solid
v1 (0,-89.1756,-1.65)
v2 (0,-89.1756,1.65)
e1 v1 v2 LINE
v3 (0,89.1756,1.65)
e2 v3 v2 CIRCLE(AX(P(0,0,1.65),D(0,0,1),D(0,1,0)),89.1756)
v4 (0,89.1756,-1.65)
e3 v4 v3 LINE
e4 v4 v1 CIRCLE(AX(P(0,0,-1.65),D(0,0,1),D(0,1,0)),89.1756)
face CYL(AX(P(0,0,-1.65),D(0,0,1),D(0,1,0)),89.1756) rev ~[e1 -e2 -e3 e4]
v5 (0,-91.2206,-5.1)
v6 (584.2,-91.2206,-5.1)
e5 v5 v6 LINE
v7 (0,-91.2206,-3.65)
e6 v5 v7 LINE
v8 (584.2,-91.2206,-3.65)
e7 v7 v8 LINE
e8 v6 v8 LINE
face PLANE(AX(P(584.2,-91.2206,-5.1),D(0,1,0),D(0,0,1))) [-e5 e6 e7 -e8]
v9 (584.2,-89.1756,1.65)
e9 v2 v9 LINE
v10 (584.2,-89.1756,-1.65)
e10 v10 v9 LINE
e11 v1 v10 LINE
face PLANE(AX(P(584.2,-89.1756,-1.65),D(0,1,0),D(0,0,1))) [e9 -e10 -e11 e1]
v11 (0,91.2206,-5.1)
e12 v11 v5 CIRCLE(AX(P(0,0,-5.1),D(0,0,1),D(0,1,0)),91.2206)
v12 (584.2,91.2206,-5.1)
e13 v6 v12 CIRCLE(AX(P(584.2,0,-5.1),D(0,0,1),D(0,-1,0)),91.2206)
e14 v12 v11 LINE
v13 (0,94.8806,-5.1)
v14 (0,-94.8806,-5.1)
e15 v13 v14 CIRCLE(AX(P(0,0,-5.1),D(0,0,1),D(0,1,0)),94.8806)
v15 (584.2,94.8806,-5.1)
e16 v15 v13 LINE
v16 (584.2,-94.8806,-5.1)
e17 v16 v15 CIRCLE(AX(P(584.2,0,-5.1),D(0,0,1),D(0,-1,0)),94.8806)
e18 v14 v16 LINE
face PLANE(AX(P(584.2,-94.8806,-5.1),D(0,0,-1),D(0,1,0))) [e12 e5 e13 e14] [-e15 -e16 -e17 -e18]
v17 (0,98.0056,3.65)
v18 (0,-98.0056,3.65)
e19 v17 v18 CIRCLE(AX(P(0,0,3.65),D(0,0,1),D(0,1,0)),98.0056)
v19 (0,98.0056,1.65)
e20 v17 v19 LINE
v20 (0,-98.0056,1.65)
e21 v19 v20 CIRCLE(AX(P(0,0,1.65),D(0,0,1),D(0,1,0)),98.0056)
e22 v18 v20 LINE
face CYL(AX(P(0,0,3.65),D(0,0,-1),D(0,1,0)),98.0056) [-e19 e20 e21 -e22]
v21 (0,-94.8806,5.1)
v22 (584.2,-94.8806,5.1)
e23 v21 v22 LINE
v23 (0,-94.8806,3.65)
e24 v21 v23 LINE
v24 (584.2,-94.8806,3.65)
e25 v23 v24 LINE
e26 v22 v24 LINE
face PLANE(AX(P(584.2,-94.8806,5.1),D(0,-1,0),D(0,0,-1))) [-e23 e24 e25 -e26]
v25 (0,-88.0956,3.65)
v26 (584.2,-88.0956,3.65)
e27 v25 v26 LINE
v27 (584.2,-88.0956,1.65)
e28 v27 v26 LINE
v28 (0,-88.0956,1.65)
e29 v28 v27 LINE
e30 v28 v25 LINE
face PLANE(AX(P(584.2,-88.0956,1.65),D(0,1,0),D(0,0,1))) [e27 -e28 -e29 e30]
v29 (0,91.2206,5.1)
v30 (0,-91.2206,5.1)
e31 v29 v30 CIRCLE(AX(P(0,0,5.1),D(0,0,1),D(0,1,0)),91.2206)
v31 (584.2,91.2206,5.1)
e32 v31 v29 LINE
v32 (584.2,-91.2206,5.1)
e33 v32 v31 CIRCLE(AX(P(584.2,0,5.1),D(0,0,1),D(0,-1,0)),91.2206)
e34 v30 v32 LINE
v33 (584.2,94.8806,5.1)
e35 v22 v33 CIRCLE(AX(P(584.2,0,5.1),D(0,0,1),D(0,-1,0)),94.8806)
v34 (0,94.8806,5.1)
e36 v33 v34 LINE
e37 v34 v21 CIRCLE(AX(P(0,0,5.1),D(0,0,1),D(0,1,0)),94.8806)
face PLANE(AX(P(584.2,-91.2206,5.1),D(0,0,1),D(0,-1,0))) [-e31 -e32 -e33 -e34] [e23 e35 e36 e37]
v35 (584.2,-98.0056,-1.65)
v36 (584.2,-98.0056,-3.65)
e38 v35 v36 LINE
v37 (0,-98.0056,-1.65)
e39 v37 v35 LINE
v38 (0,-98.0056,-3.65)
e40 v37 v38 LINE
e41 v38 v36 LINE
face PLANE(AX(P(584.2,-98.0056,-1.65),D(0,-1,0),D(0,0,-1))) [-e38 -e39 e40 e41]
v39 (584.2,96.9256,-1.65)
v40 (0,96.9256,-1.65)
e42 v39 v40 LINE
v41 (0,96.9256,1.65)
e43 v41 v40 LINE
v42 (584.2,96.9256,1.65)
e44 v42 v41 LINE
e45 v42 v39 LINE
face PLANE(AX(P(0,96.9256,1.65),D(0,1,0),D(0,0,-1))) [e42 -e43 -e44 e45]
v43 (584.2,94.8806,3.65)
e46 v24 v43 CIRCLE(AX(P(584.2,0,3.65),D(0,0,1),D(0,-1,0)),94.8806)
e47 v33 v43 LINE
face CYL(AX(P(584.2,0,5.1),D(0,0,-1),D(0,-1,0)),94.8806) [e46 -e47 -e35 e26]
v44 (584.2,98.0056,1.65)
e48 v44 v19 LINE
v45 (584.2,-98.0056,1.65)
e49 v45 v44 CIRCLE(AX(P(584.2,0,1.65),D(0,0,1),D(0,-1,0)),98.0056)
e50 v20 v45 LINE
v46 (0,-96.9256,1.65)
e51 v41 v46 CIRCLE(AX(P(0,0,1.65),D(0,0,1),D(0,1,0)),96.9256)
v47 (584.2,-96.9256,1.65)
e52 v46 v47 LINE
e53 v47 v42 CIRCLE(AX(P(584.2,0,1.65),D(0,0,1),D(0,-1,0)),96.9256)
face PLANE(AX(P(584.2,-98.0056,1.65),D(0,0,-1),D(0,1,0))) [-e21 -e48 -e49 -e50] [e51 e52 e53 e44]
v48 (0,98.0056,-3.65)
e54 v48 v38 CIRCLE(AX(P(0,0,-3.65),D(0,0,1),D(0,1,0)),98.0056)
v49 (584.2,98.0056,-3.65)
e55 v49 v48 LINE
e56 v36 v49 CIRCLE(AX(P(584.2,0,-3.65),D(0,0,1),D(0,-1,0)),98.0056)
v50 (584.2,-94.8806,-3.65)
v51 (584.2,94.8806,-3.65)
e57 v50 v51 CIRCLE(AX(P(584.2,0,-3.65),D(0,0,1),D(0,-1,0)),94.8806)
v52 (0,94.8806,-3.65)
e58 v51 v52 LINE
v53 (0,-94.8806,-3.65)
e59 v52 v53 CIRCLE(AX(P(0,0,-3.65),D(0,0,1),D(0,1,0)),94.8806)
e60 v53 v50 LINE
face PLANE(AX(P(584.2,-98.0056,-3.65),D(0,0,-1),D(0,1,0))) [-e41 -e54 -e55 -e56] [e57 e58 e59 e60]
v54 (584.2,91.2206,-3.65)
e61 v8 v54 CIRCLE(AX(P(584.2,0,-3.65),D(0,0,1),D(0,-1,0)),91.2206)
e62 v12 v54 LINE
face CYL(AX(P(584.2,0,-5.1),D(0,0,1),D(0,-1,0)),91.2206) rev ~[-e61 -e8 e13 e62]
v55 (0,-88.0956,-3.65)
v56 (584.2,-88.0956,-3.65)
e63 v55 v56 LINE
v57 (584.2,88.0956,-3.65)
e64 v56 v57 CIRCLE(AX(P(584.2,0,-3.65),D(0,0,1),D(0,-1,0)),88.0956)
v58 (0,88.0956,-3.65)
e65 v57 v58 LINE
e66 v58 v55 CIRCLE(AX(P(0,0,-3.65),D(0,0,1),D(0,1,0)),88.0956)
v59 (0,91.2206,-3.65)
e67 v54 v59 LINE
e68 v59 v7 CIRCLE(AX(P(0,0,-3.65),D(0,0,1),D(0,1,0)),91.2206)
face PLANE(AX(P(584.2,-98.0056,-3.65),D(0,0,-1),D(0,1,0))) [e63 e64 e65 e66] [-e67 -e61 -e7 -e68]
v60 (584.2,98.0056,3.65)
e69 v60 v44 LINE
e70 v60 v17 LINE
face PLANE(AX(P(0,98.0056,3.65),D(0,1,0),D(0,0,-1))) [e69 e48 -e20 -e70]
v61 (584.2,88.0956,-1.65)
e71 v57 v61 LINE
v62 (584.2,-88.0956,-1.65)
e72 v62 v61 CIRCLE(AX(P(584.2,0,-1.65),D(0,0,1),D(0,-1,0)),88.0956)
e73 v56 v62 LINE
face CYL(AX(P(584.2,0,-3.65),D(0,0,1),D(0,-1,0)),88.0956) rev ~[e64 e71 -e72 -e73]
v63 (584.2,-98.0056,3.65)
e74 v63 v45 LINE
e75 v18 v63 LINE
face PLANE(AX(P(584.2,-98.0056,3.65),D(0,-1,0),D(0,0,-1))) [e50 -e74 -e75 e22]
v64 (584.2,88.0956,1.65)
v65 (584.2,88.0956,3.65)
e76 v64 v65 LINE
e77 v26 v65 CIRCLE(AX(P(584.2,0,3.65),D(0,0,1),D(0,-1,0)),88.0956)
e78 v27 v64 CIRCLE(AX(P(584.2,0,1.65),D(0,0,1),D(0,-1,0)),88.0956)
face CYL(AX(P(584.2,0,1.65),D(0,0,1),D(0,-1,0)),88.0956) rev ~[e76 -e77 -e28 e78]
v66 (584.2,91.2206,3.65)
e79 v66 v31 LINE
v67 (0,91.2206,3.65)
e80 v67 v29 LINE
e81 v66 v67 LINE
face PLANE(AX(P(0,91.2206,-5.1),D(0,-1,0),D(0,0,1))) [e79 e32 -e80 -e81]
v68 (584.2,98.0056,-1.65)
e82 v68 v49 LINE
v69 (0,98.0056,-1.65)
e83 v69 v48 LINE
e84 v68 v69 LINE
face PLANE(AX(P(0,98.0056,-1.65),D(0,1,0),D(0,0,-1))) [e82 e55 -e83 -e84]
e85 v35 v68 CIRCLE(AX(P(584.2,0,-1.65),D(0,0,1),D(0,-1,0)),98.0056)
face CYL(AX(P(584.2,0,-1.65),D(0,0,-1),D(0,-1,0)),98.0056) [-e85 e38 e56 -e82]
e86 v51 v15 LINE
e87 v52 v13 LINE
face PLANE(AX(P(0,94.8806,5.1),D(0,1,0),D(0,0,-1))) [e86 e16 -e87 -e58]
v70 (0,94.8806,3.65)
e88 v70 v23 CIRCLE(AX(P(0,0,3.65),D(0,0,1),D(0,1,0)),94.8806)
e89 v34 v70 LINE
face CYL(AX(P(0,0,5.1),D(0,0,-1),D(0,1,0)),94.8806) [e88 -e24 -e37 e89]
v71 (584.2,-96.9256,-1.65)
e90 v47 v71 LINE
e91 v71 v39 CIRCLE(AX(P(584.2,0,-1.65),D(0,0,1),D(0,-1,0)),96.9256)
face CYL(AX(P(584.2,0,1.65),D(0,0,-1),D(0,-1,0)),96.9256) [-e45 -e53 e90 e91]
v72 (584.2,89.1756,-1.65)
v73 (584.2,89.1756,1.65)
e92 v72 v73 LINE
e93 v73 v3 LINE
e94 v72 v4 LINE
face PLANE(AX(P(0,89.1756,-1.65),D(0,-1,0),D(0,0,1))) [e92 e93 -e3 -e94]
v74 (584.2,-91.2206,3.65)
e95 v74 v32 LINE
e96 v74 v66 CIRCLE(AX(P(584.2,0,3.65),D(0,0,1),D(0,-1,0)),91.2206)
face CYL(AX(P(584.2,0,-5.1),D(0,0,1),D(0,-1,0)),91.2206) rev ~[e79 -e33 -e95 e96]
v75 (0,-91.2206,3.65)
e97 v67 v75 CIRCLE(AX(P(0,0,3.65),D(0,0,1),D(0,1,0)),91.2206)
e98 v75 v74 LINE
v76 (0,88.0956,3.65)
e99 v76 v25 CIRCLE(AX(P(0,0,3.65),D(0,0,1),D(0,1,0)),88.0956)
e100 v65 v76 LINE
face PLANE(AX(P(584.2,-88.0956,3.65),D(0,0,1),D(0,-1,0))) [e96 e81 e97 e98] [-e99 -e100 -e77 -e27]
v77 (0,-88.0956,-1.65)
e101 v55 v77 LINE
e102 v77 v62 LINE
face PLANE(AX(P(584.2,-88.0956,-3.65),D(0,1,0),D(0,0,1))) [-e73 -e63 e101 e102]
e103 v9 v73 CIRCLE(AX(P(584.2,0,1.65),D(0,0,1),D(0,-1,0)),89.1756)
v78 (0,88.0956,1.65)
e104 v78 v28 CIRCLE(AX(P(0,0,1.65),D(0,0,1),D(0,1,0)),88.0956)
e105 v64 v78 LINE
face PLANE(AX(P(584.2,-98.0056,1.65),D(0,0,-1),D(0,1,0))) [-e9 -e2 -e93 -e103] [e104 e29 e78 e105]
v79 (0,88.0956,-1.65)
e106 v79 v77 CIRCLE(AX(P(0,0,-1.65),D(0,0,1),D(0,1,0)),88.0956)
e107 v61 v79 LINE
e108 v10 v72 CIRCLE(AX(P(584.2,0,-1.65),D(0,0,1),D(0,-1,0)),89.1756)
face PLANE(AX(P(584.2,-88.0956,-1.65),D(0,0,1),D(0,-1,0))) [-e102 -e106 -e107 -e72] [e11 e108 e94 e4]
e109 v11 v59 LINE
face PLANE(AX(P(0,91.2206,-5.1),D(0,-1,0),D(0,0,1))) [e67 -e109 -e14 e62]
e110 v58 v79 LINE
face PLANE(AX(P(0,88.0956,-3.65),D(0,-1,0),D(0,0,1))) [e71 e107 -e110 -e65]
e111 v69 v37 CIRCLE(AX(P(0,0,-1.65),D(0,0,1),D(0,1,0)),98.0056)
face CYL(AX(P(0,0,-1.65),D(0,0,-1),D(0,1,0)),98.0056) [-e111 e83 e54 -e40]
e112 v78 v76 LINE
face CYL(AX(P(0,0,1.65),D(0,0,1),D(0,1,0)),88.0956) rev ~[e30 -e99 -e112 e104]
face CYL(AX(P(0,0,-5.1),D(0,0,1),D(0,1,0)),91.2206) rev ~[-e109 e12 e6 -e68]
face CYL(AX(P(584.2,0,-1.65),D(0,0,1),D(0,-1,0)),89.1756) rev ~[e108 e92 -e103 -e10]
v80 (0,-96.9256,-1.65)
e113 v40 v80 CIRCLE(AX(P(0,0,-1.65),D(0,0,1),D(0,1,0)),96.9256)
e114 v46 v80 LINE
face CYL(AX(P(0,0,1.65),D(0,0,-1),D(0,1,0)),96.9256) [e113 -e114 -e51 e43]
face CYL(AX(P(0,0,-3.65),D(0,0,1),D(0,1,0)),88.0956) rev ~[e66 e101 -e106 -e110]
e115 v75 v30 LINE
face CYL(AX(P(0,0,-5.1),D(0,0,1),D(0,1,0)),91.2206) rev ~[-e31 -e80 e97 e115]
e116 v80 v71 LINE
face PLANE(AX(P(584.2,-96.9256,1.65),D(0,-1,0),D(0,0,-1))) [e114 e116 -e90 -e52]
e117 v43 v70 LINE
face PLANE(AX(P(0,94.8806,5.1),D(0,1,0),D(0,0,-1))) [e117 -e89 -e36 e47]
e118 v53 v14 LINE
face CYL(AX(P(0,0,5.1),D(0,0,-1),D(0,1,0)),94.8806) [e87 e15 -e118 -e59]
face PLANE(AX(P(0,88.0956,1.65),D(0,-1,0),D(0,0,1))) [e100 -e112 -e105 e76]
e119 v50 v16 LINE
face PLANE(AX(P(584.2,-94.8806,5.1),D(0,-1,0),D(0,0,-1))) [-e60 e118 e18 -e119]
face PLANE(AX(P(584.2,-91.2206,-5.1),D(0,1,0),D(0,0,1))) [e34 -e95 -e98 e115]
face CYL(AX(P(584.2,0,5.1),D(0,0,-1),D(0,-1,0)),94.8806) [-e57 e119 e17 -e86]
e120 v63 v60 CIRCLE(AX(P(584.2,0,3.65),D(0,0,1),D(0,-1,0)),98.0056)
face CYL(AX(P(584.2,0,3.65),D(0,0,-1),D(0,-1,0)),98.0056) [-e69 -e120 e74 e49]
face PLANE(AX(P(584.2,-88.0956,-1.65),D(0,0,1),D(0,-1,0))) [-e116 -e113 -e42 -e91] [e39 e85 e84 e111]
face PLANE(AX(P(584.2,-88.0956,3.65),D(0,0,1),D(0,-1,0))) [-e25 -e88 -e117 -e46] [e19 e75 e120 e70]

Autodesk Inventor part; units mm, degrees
ref_plane "Work Plane2" through (0, 0, 0) normal (-1, 0, 0) x (0, 0, 1)
ref_plane "Work Plane3" through (584.2, 0, 0) normal (-1, 0, 0) x (0, 0, 1)
sketch "Path" plane through (0, 0, 0) normal (0, 0, 1) x (1, 0, 0)
  arc A0 (0, 93.0506) -> (0, -93.0506) centre (0, 0) ccw
  arc A1 (584.2, -93.0506) -> (584.2, 93.0506) centre (584.2, 0) ccw
  line L0 (584.2, -93.0506) -> (0, -93.0506)
  line L1 (0, 93.0506) -> (584.2, 93.0506)
  dimension "d31" = 9.91
ref_plane "Section Plane" through (0, -93.0506, 0) normal (1, 0, 0) x (0, 0, 1)
sketch "Section Sketch" plane through (0, -93.0506, 0) normal (1, 0, 0) x (0, 0, 1)
  line L0 (-5.1, -1.83) -> (5.1, -1.83)
  line L1 (5.1, -1.83) -> (5.1, 1.83)
  line L2 (5.1, 1.83) -> (-5.1, 1.83)
  line L3 (-5.1, 1.83) -> (-5.1, -1.83)
  line L4 (-1.65, -3.875) -> (1.65, -3.875)
  line L5 (1.65, -3.875) -> (1.65, 3.875)
  line L6 (1.65, 3.875) -> (-1.65, 3.875)
  line L7 (-1.65, 3.875) -> (-1.65, -3.875)
  line L8 (-1.65, 0) -> (1.65, 0) construction
  line L9 (-3.65, -4.955) -> (-1.65, -4.955)
  line L10 (-1.65, -4.955) -> (-1.65, 4.955)
  line L11 (-1.65, 4.955) -> (-3.65, 4.955)
  line L12 (-3.65, 4.955) -> (-3.65, -4.955)
  line L13 (1.65, -4.955) -> (3.65, -4.955)
  line L14 (3.65, -4.955) -> (3.65, 4.955)
  line L15 (3.65, 4.955) -> (1.65, 4.955)
  line L16 (1.65, 4.955) -> (1.65, -4.955)
  line L17 (-5.1, 0) -> (5.1, 0) construction
  point P0 (0, 0)
  point P1 (0, 0)
  dimension "d21" = 3.66
  dimension "d22" = 7.75
  dimension "d23" = 3.3
  dimension "d24" = 2
  dimension "d31" = 9.91
  dimension "d32" = 10.2
sweep "Solid" add profiles "Section Sketch" path "Path"
pattern_of_one "Strand Pattern"
equation "\"d21\" = da_d2"
equation "\"d22\" = da_d1"
equation "\"d23\" = da_b1"
equation "\"d24\" = da_t1 + da_t2"
equation "\"d30\" = da_pt"
equation "\"da_p\" = 12.7"
equation "\"da_b1\" = 3.3"
equation "\"da_h2\" = 9.91"
equation "\"da_h3\" = 9.91"
equation "\"da_d1\" = 7.75"
equation "\"da_d2\" = 3.66"
equation "\"da_pt\" = 13.92"
equation "\"da_b\" = 10.2"
equation "\"da_t1\" = 1"
equation "\"da_t2\" = 1"
properties part number "Roller Chain"
